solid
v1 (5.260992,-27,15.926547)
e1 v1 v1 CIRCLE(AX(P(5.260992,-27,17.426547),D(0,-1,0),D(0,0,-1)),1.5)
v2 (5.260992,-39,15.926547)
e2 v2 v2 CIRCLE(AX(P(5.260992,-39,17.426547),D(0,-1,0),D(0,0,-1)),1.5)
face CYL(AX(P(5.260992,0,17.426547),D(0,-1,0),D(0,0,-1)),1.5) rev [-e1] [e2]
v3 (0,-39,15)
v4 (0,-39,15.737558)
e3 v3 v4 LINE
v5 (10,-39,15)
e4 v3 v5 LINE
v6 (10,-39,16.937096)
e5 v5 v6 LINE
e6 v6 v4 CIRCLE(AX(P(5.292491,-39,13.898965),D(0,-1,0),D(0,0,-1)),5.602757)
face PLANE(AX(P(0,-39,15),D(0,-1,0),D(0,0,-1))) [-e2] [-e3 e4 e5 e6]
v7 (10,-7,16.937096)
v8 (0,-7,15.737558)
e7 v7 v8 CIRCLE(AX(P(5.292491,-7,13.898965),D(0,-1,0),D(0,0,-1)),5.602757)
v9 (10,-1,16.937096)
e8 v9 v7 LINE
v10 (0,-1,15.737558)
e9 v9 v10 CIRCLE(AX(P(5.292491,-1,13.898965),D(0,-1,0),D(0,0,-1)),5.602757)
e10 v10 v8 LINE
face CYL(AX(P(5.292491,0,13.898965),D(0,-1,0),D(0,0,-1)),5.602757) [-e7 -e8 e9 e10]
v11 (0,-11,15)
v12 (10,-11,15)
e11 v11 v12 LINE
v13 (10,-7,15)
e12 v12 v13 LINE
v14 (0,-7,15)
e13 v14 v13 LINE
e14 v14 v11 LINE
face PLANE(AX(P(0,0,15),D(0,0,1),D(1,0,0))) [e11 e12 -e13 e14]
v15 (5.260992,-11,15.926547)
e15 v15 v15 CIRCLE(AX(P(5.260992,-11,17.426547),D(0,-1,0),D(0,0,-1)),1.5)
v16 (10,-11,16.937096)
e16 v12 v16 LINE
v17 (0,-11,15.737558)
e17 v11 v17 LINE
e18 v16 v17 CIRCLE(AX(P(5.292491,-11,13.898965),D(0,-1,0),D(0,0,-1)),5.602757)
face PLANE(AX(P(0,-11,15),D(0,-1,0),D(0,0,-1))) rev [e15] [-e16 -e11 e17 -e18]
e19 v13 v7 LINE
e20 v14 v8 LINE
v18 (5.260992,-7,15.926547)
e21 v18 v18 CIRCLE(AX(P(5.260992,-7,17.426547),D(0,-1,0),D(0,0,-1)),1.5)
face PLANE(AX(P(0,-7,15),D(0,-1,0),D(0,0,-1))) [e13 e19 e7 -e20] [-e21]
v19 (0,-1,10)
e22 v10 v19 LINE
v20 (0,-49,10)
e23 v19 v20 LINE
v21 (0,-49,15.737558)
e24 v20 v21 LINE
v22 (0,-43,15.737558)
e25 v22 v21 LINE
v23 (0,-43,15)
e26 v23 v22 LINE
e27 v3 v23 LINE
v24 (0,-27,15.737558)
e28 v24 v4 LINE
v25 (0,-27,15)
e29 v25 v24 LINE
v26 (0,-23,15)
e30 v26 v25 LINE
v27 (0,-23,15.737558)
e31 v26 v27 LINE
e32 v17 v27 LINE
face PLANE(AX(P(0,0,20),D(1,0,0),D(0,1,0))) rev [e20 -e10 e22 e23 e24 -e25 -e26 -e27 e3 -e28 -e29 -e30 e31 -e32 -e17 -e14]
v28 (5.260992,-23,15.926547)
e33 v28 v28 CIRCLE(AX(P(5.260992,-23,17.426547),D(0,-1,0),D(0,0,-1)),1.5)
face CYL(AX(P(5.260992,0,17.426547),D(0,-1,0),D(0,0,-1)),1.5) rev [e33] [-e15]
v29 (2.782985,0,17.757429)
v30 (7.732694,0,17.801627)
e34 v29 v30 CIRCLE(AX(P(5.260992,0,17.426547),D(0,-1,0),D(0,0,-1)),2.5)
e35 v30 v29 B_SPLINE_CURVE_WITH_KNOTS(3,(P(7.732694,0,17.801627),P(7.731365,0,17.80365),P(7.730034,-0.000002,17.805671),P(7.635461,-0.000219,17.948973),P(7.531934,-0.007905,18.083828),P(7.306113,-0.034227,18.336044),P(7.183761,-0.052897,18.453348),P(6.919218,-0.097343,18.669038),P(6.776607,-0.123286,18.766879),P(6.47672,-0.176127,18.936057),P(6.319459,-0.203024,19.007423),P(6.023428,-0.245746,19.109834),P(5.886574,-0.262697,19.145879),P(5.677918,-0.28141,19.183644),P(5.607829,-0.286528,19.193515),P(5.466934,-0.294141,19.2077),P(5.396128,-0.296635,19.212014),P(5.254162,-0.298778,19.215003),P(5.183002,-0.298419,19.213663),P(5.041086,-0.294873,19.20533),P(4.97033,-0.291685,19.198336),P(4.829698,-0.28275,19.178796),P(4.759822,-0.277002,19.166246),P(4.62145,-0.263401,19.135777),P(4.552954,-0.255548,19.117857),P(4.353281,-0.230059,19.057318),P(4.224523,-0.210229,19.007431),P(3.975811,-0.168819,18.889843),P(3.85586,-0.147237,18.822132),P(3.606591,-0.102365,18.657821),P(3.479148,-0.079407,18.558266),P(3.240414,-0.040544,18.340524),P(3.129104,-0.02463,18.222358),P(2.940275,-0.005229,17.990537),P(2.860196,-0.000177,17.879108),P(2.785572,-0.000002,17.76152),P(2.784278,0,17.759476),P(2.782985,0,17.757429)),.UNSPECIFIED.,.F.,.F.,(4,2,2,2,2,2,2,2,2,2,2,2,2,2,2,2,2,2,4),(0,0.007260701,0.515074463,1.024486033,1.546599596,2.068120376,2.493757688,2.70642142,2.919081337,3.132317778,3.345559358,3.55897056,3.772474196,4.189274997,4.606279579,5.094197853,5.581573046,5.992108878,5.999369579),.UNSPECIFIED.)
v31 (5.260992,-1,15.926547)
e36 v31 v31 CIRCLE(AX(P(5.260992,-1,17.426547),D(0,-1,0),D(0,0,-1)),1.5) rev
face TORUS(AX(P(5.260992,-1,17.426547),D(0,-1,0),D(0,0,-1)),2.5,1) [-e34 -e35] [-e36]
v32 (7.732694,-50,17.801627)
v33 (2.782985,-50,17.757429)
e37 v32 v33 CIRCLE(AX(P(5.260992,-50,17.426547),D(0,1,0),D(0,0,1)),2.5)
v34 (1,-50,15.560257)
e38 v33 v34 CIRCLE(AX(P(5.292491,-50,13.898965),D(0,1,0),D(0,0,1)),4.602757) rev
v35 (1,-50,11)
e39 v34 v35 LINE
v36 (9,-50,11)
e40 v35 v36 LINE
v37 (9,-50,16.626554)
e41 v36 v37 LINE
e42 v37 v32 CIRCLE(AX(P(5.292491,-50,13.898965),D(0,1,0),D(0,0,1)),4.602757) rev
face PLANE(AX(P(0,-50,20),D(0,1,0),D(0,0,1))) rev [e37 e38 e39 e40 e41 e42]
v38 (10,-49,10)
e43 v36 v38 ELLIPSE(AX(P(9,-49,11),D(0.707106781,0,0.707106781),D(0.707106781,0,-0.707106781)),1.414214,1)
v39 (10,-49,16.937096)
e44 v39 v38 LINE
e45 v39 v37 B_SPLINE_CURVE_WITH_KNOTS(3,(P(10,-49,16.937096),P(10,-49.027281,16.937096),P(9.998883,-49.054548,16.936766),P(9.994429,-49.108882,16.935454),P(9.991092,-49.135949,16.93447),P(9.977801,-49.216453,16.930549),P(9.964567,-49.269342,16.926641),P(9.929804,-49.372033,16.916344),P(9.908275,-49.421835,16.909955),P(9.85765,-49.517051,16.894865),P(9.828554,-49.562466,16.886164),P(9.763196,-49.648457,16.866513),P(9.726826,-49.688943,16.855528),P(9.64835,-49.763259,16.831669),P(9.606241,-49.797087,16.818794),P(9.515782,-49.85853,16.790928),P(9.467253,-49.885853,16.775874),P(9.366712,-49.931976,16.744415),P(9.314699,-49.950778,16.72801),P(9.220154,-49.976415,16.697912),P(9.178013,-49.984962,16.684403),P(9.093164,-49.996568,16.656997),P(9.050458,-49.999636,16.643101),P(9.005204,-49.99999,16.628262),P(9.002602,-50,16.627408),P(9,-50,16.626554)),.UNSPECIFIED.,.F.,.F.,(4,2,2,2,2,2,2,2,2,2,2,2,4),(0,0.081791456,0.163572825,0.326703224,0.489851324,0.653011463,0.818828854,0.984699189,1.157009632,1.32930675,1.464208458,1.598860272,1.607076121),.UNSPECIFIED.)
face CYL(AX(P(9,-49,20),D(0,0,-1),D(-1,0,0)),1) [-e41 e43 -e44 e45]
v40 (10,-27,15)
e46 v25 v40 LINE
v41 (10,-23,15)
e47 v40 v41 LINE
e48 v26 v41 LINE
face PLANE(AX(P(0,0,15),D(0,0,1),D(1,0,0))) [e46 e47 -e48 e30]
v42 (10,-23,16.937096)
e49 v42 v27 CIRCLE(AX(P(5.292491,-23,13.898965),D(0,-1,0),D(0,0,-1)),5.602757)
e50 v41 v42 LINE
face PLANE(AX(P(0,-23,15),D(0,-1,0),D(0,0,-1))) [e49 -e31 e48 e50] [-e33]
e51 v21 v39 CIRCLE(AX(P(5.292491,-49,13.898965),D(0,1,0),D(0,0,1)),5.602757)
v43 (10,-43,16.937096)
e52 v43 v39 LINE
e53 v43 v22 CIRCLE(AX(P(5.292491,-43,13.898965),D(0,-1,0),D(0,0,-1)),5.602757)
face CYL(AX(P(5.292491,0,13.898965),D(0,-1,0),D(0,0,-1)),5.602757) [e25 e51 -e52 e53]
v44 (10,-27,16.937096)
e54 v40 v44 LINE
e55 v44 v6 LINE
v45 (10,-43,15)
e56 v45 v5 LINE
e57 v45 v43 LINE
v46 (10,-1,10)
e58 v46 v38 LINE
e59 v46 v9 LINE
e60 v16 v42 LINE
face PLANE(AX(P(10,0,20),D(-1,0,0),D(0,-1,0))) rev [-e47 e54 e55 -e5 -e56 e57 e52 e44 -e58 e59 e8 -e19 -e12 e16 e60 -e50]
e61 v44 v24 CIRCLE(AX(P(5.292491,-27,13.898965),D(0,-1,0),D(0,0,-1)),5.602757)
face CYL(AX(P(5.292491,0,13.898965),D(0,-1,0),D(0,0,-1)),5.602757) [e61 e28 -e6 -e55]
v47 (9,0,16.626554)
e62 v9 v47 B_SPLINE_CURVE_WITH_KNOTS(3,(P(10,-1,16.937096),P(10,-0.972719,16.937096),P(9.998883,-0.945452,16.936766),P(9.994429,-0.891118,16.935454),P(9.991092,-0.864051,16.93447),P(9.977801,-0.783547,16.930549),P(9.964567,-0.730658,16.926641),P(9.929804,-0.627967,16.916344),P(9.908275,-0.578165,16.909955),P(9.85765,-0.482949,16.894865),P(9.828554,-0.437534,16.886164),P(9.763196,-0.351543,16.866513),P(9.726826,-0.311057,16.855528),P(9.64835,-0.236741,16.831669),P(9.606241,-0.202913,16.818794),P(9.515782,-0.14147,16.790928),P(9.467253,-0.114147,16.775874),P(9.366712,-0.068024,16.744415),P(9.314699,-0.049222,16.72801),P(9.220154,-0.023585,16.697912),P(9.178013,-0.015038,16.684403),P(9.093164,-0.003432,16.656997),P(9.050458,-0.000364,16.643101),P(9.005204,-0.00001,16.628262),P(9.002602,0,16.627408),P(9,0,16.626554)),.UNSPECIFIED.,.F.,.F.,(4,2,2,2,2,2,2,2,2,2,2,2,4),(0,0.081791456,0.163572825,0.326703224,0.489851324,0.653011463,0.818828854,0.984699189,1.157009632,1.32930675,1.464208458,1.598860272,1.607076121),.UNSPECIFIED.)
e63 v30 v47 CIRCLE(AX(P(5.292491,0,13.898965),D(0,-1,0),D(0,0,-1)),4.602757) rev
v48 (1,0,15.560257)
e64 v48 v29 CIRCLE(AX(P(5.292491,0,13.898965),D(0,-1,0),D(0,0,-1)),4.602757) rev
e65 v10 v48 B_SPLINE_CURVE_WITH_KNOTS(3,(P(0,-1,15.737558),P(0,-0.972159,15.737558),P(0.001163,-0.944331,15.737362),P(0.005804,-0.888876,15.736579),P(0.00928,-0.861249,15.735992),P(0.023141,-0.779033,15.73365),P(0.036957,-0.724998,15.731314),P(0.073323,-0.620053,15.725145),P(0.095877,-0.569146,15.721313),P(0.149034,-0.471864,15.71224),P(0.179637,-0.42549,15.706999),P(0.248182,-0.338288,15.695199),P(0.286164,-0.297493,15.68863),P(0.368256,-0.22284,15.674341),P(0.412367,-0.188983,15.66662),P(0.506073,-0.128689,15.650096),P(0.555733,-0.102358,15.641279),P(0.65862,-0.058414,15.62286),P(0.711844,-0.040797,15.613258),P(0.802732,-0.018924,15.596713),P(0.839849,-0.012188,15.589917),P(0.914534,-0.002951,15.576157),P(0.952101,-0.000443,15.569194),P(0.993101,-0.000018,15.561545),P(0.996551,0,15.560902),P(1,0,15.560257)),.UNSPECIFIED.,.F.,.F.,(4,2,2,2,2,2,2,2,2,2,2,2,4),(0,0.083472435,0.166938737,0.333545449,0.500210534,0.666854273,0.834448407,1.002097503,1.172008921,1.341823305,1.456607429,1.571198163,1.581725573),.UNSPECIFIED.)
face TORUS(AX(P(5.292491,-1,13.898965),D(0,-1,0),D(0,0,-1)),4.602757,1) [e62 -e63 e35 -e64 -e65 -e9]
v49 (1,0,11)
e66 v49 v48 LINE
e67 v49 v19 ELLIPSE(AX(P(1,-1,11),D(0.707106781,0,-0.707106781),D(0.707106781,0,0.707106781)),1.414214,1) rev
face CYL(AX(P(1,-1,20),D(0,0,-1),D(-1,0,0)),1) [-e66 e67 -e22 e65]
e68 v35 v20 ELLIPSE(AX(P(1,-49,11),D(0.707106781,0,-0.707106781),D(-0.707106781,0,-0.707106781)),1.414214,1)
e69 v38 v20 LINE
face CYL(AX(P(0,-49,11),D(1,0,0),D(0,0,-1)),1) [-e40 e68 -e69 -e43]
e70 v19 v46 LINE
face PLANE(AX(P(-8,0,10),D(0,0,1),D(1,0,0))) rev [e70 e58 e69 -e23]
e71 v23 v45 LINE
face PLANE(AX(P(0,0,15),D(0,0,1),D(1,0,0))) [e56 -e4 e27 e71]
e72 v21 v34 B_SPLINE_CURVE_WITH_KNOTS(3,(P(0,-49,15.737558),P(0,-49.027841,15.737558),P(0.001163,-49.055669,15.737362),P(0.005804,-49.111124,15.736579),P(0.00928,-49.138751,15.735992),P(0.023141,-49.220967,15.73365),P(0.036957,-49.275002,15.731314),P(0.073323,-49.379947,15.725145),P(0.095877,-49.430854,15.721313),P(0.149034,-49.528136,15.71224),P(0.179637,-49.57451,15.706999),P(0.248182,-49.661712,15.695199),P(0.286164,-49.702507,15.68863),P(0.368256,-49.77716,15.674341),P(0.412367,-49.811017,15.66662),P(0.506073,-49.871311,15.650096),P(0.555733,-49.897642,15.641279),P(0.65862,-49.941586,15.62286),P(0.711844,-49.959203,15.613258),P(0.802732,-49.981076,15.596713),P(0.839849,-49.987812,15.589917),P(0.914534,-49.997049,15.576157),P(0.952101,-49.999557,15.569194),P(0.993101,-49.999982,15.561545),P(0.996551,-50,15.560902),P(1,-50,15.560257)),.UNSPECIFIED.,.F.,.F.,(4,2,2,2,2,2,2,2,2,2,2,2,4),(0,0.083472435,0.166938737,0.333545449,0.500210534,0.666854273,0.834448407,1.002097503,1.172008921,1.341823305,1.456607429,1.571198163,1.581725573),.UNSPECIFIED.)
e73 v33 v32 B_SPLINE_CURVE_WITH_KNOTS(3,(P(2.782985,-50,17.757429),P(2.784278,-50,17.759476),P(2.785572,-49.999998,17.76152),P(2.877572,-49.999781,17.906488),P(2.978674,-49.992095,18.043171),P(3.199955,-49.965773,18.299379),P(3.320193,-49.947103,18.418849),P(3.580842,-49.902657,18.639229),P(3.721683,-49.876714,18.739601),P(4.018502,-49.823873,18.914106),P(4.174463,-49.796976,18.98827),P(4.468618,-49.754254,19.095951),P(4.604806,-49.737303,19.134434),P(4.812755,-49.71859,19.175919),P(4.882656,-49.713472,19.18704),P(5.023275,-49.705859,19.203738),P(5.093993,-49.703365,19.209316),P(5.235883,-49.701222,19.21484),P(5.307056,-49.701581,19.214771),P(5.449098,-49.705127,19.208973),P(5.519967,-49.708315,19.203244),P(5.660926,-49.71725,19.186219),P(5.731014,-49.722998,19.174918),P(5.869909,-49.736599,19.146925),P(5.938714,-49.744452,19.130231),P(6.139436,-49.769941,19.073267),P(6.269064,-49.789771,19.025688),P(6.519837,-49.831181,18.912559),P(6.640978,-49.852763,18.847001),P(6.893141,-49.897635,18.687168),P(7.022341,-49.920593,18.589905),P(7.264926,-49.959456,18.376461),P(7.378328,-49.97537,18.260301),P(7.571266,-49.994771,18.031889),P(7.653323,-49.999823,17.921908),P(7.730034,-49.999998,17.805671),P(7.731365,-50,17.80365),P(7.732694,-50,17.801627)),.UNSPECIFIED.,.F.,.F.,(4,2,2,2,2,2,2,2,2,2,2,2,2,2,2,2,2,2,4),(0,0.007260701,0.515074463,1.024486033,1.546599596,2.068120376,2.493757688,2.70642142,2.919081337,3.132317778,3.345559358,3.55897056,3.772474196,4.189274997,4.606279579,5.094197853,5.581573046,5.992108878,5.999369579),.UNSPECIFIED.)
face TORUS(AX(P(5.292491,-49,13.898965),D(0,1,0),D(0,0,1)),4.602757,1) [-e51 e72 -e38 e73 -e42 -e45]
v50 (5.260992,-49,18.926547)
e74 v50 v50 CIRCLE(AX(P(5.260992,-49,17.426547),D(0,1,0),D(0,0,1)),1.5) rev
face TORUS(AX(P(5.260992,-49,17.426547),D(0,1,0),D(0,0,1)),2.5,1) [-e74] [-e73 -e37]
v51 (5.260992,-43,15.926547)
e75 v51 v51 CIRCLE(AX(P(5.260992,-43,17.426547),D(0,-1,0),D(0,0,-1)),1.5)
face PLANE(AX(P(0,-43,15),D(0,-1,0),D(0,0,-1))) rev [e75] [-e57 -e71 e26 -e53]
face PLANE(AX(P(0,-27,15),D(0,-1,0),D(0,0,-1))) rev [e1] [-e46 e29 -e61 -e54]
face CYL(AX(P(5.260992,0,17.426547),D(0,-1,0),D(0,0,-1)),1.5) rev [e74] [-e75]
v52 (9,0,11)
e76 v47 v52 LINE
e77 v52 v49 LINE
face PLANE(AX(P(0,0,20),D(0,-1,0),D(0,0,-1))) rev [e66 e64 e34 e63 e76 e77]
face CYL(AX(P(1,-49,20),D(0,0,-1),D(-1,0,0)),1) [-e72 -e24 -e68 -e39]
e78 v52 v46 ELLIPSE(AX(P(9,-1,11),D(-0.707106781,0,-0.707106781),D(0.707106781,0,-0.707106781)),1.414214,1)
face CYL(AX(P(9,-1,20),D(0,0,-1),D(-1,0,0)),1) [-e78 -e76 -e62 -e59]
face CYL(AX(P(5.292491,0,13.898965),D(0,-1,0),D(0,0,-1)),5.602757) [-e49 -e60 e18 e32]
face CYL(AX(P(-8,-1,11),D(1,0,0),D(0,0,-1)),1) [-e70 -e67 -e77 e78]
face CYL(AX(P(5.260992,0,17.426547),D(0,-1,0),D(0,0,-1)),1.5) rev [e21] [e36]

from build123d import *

# Parameters (mm, degrees)
BOSS_EXTRUDE1_DEPTH     = 20
CUT_EXTRUDE1_DEPTH      = 5
SKETCH3_W               = 10
SKETCH3_H               = 50.00000000000001
CUT_EXTRUDE2_DEPTH      = 18.000000000000007
CUT_EXTRUDE3_DEPTH      = 45.955533585978046
CUT_EXTRUDE3_DEPTH_BACK = 45.955533585978046
SKETCH4_R               = 1.5
CUT_EXTRUDE4_DEPTH      = 55.772255750516614
CUT_EXTRUDE4_DEPTH_BACK = 55.772255750516614
FILLET1_R               = 1


with BuildPart() as part:
    # Sketch1 → Boss-Extrude1 (new body)
    with BuildSketch(Plane.XY):
        Polygon((0, 0), (10, 0), (10.000000000000007, -50), (6.12e-15, -50), align=None)
    extrude(amount=BOSS_EXTRUDE1_DEPTH)

    # Sketch2 → Cut-Extrude1 (cut)
    with BuildSketch(Plane.XY.offset(20)):
        Polygon((10.000000000000009, -7), (8.6e-16, -7), (7.6e-16, -11), (10.000000000000005, -11), align=None)
        Polygon((10.000000000000007, -23), (1.47e-15, -23), (3.8e-16, -27), (10.000000000000004, -27), align=None)
        Polygon((10.000000000000005, -39), (1.47e-15, -39), (0, -43), (10.000000000000007, -43), align=None)
    extrude(amount=-CUT_EXTRUDE1_DEPTH, mode=Mode.SUBTRACT)

    # Sketch3 → Cut-Extrude2 (cut)
    with BuildSketch(Plane(origin=(10, 1.39e-15, 0), x_dir=(0, 0, -1), z_dir=(1, 1.4e-16, 0))):
        with Locations((-5, -25.000000000000004)):
            Rectangle(SKETCH3_W, SKETCH3_H)
    extrude(amount=-CUT_EXTRUDE2_DEPTH, mode=Mode.SUBTRACT)

    # Sketch4 → Cut-Extrude3 (cut, two sides: drawn at the far end of the back side and taken through both)
    with BuildSketch(Plane.XZ.offset(39).offset(-CUT_EXTRUDE3_DEPTH_BACK)):
        with Locations(Location((5.260991578815225, 17.426547092913836, 0), (0, 0, 270))):
            Circle(SKETCH4_R)
    extrude(amount=CUT_EXTRUDE3_DEPTH + CUT_EXTRUDE3_DEPTH_BACK, mode=Mode.SUBTRACT)

    # Sketch5 → Cut-Extrude4 (cut, two sides: drawn at the far end of the back side and taken through both)
    with BuildSketch(Plane.XZ.offset(50).offset(-CUT_EXTRUDE4_DEPTH_BACK)):
        with BuildLine():
            Line((6.12e-15, 20), (0, 15.73755811618498))
            ThreePointArc((-8.9e-16, 15.73755811618498), (4.6252026328097955, 19.461842499702882), (10.000000000000007, 16.93709561624879))
            Line((10.000000000000007, 16.93709561624879), (10.000000000000007, 20))
            Line((10.000000000000007, 20), (6.12e-15, 20))
        make_face()
    extrude(amount=CUT_EXTRUDE4_DEPTH + CUT_EXTRUDE4_DEPTH_BACK, mode=Mode.SUBTRACT)

    # Fillet1
    # the kernel refuses this fillet: 1 mm, written as the material it takes off along each edge
    with BuildSketch(Plane(origin=(10, 0, 7.5), x_dir=(-1, 0, 0), z_dir=(0, 0, 1))) as fillet1_piece_1:
        with BuildLine():
            CenterArc((FILLET1_R, FILLET1_R), FILLET1_R, 180, 90)
            Line((0, FILLET1_R), (0, 0))
            Line((0, 0), (FILLET1_R, 0))
        make_face()
    extrude(amount=11.93709561624879, mode=Mode.SUBTRACT)
    with BuildSketch(Plane(origin=(0, 0, 7.5), x_dir=(1, 0, 0), z_dir=(0, 0, 1))) as fillet1_piece_2:
        with BuildLine():
            CenterArc((FILLET1_R, -FILLET1_R), FILLET1_R, 90, 90)
            Line((2.2e-16, -FILLET1_R), (0, 0))
            Line((0, 0), (FILLET1_R, 0))
        make_face()
    extrude(amount=10.737558116184978, mode=Mode.SUBTRACT)
    with BuildSketch(Plane(origin=(6.12e-15, -50, 7.5), x_dir=(-1.3e-16, 1, 0), z_dir=(0, 0, 1))) as fillet1_piece_3:
        with BuildLine():
            CenterArc((FILLET1_R, -FILLET1_R), FILLET1_R, 90, 89.99999999999997)
            Line((-1.3e-16, -FILLET1_R), (0, 0))
            Line((0, 0), (FILLET1_R, 0))
        make_face()
    extrude(amount=10.737558116184978, mode=Mode.SUBTRACT)
    with BuildSketch(Plane(origin=(10.000000000000007, -50, 7.5), x_dir=(0, 1, 0), z_dir=(0, 0, 1))) as fillet1_piece_4:
        with BuildLine():
            CenterArc((FILLET1_R, FILLET1_R), FILLET1_R, 180, 90)
            Line((0, FILLET1_R), (0, 0))
            Line((0, 0), (FILLET1_R, 0))
        make_face()
    extrude(amount=11.93709561624879, mode=Mode.SUBTRACT)
    with BuildSketch(Plane(origin=(5.292490697981418, -50, 13.898964597710425), x_dir=(-0.9937101746292788, 0, -0.11198253809522406), z_dir=(0.11198253809522406, 0, -0.9937101746292788))) as fillet1_piece_5:
        with BuildLine():
            CenterArc((5.602756813783422 - FILLET1_R, FILLET1_R), FILLET1_R, 270, 90)
            Line((5.602756813783423, FILLET1_R), (5.602756813783422, 0))
            Line((5.602756813783422, 0), (5.602756813783422 - FILLET1_R, 0))
        make_face()
    revolve(axis=Axis((5.292490697981418, -50, 13.898964597710425), (0, 1, 0)), revolution_arc=179.17890353520545, mode=Mode.SUBTRACT)
    with BuildSketch(Plane(origin=(5.292490697981418, 0, 13.898964597710425), x_dir=(-0.9937101746292788, 0, -0.11198253809522406), z_dir=(0.11198253809522406, 0, -0.9937101746292788))) as fillet1_piece_6:
        with BuildLine():
            CenterArc((5.602756813783421 - FILLET1_R, -FILLET1_R), FILLET1_R, 0, 90)
            Line((5.602756813783421, -FILLET1_R), (5.602756813783421, 0))
            Line((5.602756813783421, 0), (5.602756813783421 - FILLET1_R, 0))
        make_face()
    revolve(axis=Axis((5.292490697981418, 0, 13.898964597710425), (0, 1, 0)), revolution_arc=179.17890353520545, mode=Mode.SUBTRACT)
    with BuildSketch(Plane(origin=(12.500000000000007, -50, 10), x_dir=(-1.4e-16, 1, 0), z_dir=(-1, -1.4e-16, 0))) as fillet1_piece_7:
        with BuildLine():
            CenterArc((FILLET1_R, -FILLET1_R), FILLET1_R, 90, 90)
            Line((0, -FILLET1_R), (0, 0))
            Line((0, 0), (FILLET1_R, 0))
        make_face()
    extrude(amount=15.000000000000002, mode=Mode.SUBTRACT)
    with BuildSketch(Plane(origin=(12.5, 0, 10), x_dir=(0, 0, 1), z_dir=(-1, -1.4e-16, 0))) as fillet1_piece_8:
        with BuildLine():
            CenterArc((FILLET1_R, -FILLET1_R), FILLET1_R, 90, 90)
            Line((0, -FILLET1_R), (0, 0))
            Line((0, 0), (FILLET1_R, 0))
        make_face()
    extrude(amount=15, mode=Mode.SUBTRACT)
    with BuildSketch(Plane(origin=(5.260991578815225, 0, 17.426547092913836), x_dir=(0, 0, -1), z_dir=(-1, 0, 0))) as fillet1_piece_9:
        with BuildLine():
            CenterArc((1.5 + FILLET1_R, FILLET1_R), FILLET1_R, 180, 90)
            Line((1.5, FILLET1_R), (1.5, 0))
            Line((1.5, 0), (1.5 + FILLET1_R, 0))
        make_face()
    revolve(axis=Axis((5.260991578815225, 0, 17.426547092913836), (0, -1, 0)), mode=Mode.SUBTRACT)
    with BuildSketch(Plane(origin=(5.260991578815225, -50, 17.426547092913836), x_dir=(0, 0, -1), z_dir=(1, 0, 0))) as fillet1_piece_10:
        with BuildLine():
            CenterArc((1.5 + FILLET1_R, FILLET1_R), FILLET1_R, 180, 90)
            Line((1.5, FILLET1_R), (1.5, 0))
            Line((1.5, 0), (1.5 + FILLET1_R, 0))
        make_face()
    revolve(axis=Axis((5.260991578815225, -50, 17.426547092913836), (0, 1, 0)), mode=Mode.SUBTRACT)


solid = part.part
